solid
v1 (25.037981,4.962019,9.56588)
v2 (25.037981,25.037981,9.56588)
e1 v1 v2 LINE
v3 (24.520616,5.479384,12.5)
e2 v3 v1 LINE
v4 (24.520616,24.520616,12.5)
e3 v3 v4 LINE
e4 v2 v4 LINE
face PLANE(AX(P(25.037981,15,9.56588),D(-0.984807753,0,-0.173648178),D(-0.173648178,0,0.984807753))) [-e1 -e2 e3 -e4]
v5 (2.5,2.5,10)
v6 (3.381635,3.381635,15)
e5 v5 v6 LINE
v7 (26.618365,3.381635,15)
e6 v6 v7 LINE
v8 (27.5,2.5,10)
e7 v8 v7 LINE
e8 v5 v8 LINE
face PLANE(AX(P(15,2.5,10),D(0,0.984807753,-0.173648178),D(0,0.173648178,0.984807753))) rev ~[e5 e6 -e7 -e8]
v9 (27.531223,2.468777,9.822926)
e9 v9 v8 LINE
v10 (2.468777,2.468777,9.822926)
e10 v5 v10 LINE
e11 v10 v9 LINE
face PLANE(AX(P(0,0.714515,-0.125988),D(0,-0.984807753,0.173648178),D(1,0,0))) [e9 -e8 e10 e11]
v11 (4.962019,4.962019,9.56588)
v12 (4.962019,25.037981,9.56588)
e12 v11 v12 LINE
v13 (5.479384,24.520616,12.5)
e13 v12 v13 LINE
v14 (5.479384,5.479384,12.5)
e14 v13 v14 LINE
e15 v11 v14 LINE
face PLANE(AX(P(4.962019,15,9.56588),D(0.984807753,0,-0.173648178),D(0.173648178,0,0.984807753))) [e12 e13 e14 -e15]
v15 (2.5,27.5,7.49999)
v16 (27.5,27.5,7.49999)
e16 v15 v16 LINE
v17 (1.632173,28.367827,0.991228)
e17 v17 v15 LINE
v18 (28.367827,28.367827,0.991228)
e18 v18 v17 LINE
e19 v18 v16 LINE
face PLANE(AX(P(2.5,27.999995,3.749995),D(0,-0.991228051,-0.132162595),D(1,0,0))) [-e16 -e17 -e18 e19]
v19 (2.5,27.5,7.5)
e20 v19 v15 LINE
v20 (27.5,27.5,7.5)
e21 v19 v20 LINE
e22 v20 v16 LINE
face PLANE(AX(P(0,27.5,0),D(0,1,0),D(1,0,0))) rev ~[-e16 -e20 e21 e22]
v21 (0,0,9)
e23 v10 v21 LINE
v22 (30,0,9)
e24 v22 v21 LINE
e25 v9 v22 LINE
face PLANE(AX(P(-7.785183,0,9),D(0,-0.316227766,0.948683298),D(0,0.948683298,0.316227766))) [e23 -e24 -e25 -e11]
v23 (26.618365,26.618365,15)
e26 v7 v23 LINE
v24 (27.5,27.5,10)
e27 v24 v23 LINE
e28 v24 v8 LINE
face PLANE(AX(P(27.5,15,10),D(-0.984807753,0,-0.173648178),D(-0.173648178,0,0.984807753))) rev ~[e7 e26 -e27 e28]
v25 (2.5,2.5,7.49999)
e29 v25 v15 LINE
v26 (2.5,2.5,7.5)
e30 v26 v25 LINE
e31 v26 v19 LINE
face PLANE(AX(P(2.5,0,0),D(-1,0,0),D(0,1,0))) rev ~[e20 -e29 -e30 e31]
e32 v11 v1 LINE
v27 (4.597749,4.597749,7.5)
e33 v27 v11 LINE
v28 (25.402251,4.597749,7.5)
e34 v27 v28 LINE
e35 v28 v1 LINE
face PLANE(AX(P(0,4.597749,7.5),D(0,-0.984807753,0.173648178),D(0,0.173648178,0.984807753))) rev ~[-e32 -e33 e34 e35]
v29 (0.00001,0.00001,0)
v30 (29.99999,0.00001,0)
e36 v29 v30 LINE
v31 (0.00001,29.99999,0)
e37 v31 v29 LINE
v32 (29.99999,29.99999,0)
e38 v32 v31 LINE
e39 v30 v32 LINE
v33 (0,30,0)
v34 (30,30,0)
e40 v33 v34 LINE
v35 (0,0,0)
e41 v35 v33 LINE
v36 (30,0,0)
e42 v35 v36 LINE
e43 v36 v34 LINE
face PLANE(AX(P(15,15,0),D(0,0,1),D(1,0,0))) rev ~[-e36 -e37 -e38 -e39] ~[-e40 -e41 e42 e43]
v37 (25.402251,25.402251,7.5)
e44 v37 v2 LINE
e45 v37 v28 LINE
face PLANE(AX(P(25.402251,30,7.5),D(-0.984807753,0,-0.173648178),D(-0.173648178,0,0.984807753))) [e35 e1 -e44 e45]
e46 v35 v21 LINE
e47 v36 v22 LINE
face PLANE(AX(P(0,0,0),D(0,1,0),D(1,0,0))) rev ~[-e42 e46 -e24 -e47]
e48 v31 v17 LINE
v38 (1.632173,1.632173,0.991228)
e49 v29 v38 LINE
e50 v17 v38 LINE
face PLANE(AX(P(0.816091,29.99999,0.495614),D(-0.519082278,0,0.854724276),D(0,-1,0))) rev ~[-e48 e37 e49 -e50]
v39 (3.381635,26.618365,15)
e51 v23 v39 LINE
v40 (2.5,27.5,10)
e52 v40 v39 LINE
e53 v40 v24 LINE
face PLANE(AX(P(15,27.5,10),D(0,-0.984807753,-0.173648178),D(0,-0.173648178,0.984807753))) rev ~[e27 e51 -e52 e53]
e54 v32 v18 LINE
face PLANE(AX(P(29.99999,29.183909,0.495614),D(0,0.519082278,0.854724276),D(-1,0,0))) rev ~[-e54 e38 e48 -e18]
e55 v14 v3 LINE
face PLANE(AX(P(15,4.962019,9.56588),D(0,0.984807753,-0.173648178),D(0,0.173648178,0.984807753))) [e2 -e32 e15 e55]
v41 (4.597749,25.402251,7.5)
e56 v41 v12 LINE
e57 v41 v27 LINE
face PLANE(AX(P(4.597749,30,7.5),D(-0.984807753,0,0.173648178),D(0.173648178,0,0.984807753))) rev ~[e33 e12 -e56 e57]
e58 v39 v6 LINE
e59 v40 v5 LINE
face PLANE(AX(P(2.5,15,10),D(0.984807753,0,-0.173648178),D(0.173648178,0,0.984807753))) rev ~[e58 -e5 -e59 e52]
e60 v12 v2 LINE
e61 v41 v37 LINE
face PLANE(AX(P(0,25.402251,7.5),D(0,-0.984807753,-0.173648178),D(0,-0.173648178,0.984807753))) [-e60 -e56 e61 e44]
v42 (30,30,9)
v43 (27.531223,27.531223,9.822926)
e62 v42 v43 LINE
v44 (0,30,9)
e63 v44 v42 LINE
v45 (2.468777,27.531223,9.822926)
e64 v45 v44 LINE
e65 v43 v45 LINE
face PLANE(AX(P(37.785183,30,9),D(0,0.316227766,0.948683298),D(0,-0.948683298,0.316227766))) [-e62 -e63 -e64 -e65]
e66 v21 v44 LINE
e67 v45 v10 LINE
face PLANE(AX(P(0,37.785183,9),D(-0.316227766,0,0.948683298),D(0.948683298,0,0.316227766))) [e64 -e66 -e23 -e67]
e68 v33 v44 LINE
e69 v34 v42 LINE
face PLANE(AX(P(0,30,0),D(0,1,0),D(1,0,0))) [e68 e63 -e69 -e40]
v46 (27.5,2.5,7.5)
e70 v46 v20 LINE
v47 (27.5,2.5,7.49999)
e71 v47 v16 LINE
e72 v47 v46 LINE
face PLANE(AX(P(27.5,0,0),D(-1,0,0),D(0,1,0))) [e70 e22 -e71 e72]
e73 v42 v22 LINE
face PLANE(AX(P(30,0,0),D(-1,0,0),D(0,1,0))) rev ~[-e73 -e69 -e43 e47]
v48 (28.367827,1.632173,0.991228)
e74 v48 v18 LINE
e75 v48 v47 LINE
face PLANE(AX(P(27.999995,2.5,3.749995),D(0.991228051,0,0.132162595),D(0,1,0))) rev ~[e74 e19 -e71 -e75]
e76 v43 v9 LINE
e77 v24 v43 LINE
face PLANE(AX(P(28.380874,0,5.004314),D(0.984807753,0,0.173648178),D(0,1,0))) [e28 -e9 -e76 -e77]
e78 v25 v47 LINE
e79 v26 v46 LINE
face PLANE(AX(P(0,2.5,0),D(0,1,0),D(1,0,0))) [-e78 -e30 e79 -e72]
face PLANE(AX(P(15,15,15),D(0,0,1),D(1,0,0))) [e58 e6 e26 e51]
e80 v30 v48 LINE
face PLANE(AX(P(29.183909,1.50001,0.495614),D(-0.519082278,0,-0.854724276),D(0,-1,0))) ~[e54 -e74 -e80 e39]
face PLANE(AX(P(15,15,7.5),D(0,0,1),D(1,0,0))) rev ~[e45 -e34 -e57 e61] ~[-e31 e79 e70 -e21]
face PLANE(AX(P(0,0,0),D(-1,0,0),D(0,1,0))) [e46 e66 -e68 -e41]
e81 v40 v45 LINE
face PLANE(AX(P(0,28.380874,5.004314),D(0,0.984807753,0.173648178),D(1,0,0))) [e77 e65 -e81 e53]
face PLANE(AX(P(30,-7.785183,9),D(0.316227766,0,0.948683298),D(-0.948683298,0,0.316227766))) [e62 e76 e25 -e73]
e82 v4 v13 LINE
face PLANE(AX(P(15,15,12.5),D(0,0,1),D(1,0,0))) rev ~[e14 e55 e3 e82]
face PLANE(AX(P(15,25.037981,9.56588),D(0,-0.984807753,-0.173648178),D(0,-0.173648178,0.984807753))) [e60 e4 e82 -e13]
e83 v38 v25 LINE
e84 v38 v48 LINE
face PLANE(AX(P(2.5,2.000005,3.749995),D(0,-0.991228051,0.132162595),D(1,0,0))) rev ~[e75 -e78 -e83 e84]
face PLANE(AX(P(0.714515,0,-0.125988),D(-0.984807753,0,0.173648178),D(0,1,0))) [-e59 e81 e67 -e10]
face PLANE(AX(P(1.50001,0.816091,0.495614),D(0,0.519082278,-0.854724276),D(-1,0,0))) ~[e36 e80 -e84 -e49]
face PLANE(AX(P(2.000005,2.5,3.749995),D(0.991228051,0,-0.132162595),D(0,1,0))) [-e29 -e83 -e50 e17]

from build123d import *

# Parameters (mm, degrees)
F0_W          = 30
F0_H          = 30
F1_DEPTH      = 10
F2_T          = -2.5
F3_SIZE2      = 7.49999
F3_SIZE       = 0.99999
F4_W          = 25
F4_H          = 25
F5_DEPTH      = 5
F5_TAPER      = 10
F6_T          = 2.5
F6_T3_DEPTH   = 12.6321563139
F6_T5_DEPTH   = 12.6321563139
F6_T7_DEPTH   = 12.6321563139
F6_T9_DEPTH   = 12.6321563139
F6_T11_DEPTH  = 5.00001
F6_T13_DEPTH  = 30
F6_T15_DEPTH  = 30
F7_T4_DEPTH   = 45.5703660639
F7_T10_DEPTH  = 45.5703660639
F7_T16_DEPTH  = 45.5703660639
F7_T23_DEPTH  = 45.5703660639
F7_T29_DEPTH  = 45.5703660639
F7_T35_DEPTH  = 45.5703660639
F7_T41_DEPTH  = 45.5703660639
F7_T47_DEPTH  = 45.5703660639
F7_T54_DEPTH  = 45.5703660639
F7_T60_DEPTH  = 45.5703660639
F7_T66_DEPTH  = 45.5703660639
F7_T72_DEPTH  = 45.5703660639
F7_T78_DEPTH  = 45.5703660639
F7_T85_DEPTH  = 45.5703660639
F7_T91_DEPTH  = 45.5703660639
F7_T97_DEPTH  = 45.5703660639
F7_T103_DEPTH = 45.5703660639
F7_T109_DEPTH = 45.5703660639
F7_T116_DEPTH = 45.5703660639
F7_T122_DEPTH = 45.5703660639
F8_C1_SIZE2   = 1
F8_C1_SIZE    = 1.5
F8_C2_SIZE2   = 1
F8_C2_SIZE    = 1.5
F8_C3_SIZE2   = 1
F8_C3_SIZE    = 1.5
F8_C4_SIZE2   = 1
F8_C4_SIZE    = 1.5


# Not quite as in the source:
# - a fillet or chamfer that OpenCascade refuses, or shapes differently, is made with other operations: its cross-section is extruded or revolved along the edge and cut away or added
# - a fillet or chamfer is up to 0.001 mm smaller than in the source, because OpenCascade refuses the exact size
# - a shell that OpenCascade refuses in one call is made with other operations: the cavity is built on its own and cut out


with BuildPart() as f1:
    # F0 (on Top) → F1 (new body)
    with BuildSketch(Plane.XY):
        with Locations((15, 15)):
            Rectangle(F0_W, F0_H)
    extrude(amount=F1_DEPTH)

    # F2
    f2_openings = [f1.faces().sort_by_distance(p)[0] for p in [
        (15, 15, 0),
    ]]
    offset(amount=F2_T, openings=f2_openings)

    # F3 (size 1 and 7.5 in the source; OpenCascade refuses exactly that, so slightly less here)
    f3_edges = [f1.edges().sort_by_distance(p)[0] for p in [
        (27.5, 15, 0),
        (15, 27.5, 0),
        (2.5, 15, 0),
        (15, 2.5, 0),
    ]]
    chamfer(f3_edges, length=F3_SIZE, length2=F3_SIZE2)

    # F4 (on face) → F5 (join)
    with BuildSketch(Plane.XY.offset(10)):
        with Locations((15, 15)):
            Rectangle(F4_W, F4_H)
    extrude(amount=F5_DEPTH, taper=F5_TAPER)

    # F6: shell of thickness 2.5, made by hand


with BuildPart() as f6_core1:
    # F6_t2: copy of F1
    add(f1.part)

    # the walls: a layer under each face that stays
    f6_faces = [f6_core1.faces().sort_by_distance(p)[0] for p in [
        (1, 1, 0),
        (27.999995, 15, 3.749995),
        (15, 2.000005, 3.749995),
        (15, 27.999995, 3.749995),
        (2.000005, 15, 3.749995),
        (0, 15, 5),
        (15, 0, 5),
        (30, 15, 5),
        (15, 30, 5),
        (27.5, 15, 7.499995),
        (15, 2.5, 7.499995),
        (15, 27.5, 7.499995),
        (2.5, 15, 7.499995),
        (2.1428571429, 2.1428571429, 10),
        (27.0591825482, 15, 12.5),
        (15, 27.0591825482, 12.5),
        (2.9408174518, 15, 12.5),
        (15, 2.9408174518, 12.5),
        (15, 15, 15),
    ]]
    thicken(f6_faces, amount=-F6_T, mode=Mode.SUBTRACT)

    # F6_s4 → F6_t3 (cut)
    with BuildSketch(Plane(origin=(0.7910693611, -0.7910693611, -5.9330716286), x_dir=(-0.7071067812, -0.7071067812, 0), z_dir=(-0.1310232599, 0.1310232599, 0.9826829655))):
        Polygon((-21.2132034356, 18.7255916199), (-22.9654636265, 20.5443932655), (-21.2132034356, 22.2663095063), (-19.4609432447, 20.5443932655), align=None)
    extrude(amount=F6_T3_DEPTH, mode=Mode.SUBTRACT)

    # F6_s6 → F6_t5 (cut)
    with BuildSketch(Plane(origin=(1.3060821999, 1.3060821999, -9.7957013952), x_dir=(0.7071067812, -0.7071067812, 0), z_dir=(-0.1310232599, -0.1310232599, 0.9826829655))):
        Polygon((0, 39.5714452805), (1.7522601909, 41.3902469261), (0, 43.1121631669), (-1.7522601909, 41.3902469261), align=None)
    extrude(amount=F6_T5_DEPTH, mode=Mode.SUBTRACT)

    # F6_s8 → F6_t7 (cut)
    with BuildSketch(Plane(origin=(-0.2760565224, -0.2760565224, -2.0704418621), x_dir=(-0.7071067812, 0.7071067812, 0), z_dir=(0.1310232599, 0.1310232599, 0.9826829655))):
        Polygon((0, -2.1202620407), (-1.7522601909, -0.3014603951), (0, 1.4204558457), (1.7522601909, -0.3014603951), align=None)
    extrude(amount=F6_T7_DEPTH, mode=Mode.SUBTRACT)

    # F6_s10 → F6_t9 (cut)
    with BuildSketch(Plane(origin=(-0.7910693611, 0.7910693611, -5.9330716286), x_dir=(0.7071067812, 0.7071067812, 0), z_dir=(0.1310232599, -0.1310232599, 0.9826829655))):
        Polygon((21.2132034356, 18.7255916199), (22.9654636265, 20.5443932655), (21.2132034356, 22.2663095063), (19.4609432447, 20.5443932655), align=None)
    extrude(amount=F6_T9_DEPTH, mode=Mode.SUBTRACT)

    # F6_s12 → F6_t11 (cut)
    with BuildSketch(Plane.XY.offset(4.99999)):
        Polygon((27.475, 2.525), (30, 2.5), (30, 0), (27.5, 0), align=None)
        Polygon((27.475, 27.475), (30, 27.5), (30, 30), (27.5, 30), align=None)
        Polygon((2.525, 2.525), (2.5, 0), (0, 0), (0, 2.5), align=None)
        Polygon((2.525, 27.475), (2.5, 30), (0, 30), (0, 27.5), align=None)
    extrude(amount=F6_T11_DEPTH, mode=Mode.SUBTRACT)

    # F6_s14 → F6_t13 (cut)
    with BuildSketch(Plane.XZ.offset(-30)):
        Polygon((27.5246201938, 10.0293412044), (27.5, 7.5), (25.4022509221, 7.5), (25.0379806175, 9.5658795558), align=None)
        Polygon((2.4753798062, 10.0293412044), (2.5, 7.5), (4.5977490779, 7.5), (4.9620193825, 9.5658795558), align=None)
    extrude(amount=F6_T13_DEPTH, mode=Mode.SUBTRACT)

    # F6_s16 → F6_t15 (cut)
    with BuildSketch(Plane.YZ):
        Polygon((27.5246201938, 10.0293412044), (27.5, 7.5), (25.4022509221, 7.5), (25.0379806175, 9.5658795558), align=None)
        Polygon((2.4753798062, 10.0293412044), (2.5, 7.5), (4.5977490779, 7.5), (4.9620193825, 9.5658795558), align=None)
    extrude(amount=F6_T15_DEPTH, mode=Mode.SUBTRACT)


with BuildPart() as f1_1:
    add(f1.part)

    # what is left inside the walls is the cavity
    f6_cavity = [f6_core1.part.solids().sort_by_distance(p)[0] for p in [
        (15, 11.532583, 7.525),
    ]]
    add(f6_cavity, mode=Mode.SUBTRACT)

    # F7: chamfer of 1 x 3 on 4 edges, made by hand


with BuildPart() as f7_tool2:
    # F7_s3 → F7_t4 (new body)
    with BuildSketch(Plane.XZ.offset(7.785183032)):
        Polygon((30, 9), (27, 10), (30, 10), align=None)
    extrude(amount=-F7_T4_DEPTH)

    split(bisect_by=Plane(origin=(28.3808742524, 0, 5.0043138668), x_dir=(0, 1, 0), z_dir=(0.984807753, 0, 0.1736481777)), keep=Keep.TOP)

    split(bisect_by=Plane(origin=(0, 0.7145150594, -0.1259882831), x_dir=(1, 0, 0), z_dir=(0, -0.984807753, 0.1736481777)), keep=Keep.TOP)


with BuildPart() as f1_2:
    add(f1_1.part)

    # F7_t1: cut F7_tool2
    add(f7_tool2.part, mode=Mode.SUBTRACT)


with BuildPart() as f7_tool8:
    # F7_s9 → F7_t10 (new body)
    with BuildSketch(Plane.XZ.offset(7.785183032)):
        Polygon((30, 9), (27, 10), (30, 10), align=None)
    extrude(amount=-F7_T10_DEPTH)

    split(bisect_by=Plane(origin=(28.3808742524, 0, 5.0043138668), x_dir=(0, 1, 0), z_dir=(-0.984807753, 0, -0.1736481777)), keep=Keep.TOP)

    split(bisect_by=Plane(origin=(0, 0.7145150594, -0.1259882831), x_dir=(1, 0, 0), z_dir=(0, -0.984807753, 0.1736481777)), keep=Keep.TOP)


with BuildPart() as f1_3:
    add(f1_2.part)

    # F7_t7: cut F7_tool8
    add(f7_tool8.part, mode=Mode.SUBTRACT)


with BuildPart() as f7_tool14:
    # F7_s15 → F7_t16 (new body)
    with BuildSketch(Plane.XZ.offset(7.785183032)):
        Polygon((30, 9), (27, 10), (30, 10), align=None)
    extrude(amount=-F7_T16_DEPTH)

    split(bisect_by=Plane(origin=(28.3808742524, 0, 5.0043138668), x_dir=(0, 1, 0), z_dir=(0.984807753, 0, 0.1736481777)), keep=Keep.TOP)

    split(bisect_by=Plane(origin=(0, 28.3808742524, 5.0043138668), x_dir=(1, 0, 0), z_dir=(0, -0.984807753, -0.1736481777)), keep=Keep.TOP)

    split(bisect_by=Plane(origin=(0, 0.7145150594, -0.1259882831), x_dir=(1, 0, 0), z_dir=(0, 0.984807753, -0.1736481777)), keep=Keep.TOP)


with BuildPart() as f1_4:
    add(f1_3.part)

    # F7_t13: cut F7_tool14
    add(f7_tool14.part, mode=Mode.SUBTRACT)


with BuildPart() as f7_tool21:
    # F7_s22 → F7_t23 (new body)
    with BuildSketch(Plane.XZ.offset(7.785183032)):
        Polygon((30, 9), (27, 10), (30, 10), align=None)
    extrude(amount=-F7_T23_DEPTH)

    split(bisect_by=Plane(origin=(28.3808742524, 0, 5.0043138668), x_dir=(0, 1, 0), z_dir=(0.984807753, 0, 0.1736481777)), keep=Keep.TOP)

    split(bisect_by=Plane(origin=(0, 28.3808742524, 5.0043138668), x_dir=(1, 0, 0), z_dir=(0, 0.984807753, 0.1736481777)), keep=Keep.TOP)


with BuildPart() as f1_5:
    add(f1_4.part)

    # F7_t20: cut F7_tool21
    add(f7_tool21.part, mode=Mode.SUBTRACT)


with BuildPart() as f7_tool27:
    # F7_s28 → F7_t29 (new body)
    with BuildSketch(Plane.XZ.offset(7.785183032)):
        Polygon((30, 9), (27, 10), (30, 10), align=None)
    extrude(amount=-F7_T29_DEPTH)

    split(bisect_by=Plane(origin=(28.3808742524, 0, 5.0043138668), x_dir=(0, 1, 0), z_dir=(-0.984807753, 0, -0.1736481777)), keep=Keep.TOP)

    split(bisect_by=Plane(origin=(0, 28.3808742524, 5.0043138668), x_dir=(1, 0, 0), z_dir=(0, 0.984807753, 0.1736481777)), keep=Keep.TOP)


with BuildPart() as f1_6:
    add(f1_5.part)

    # F7_t26: cut F7_tool27
    add(f7_tool27.part, mode=Mode.SUBTRACT)


with BuildPart() as f7_tool33:
    # F7_s34 → F7_t35 (new body)
    with BuildSketch(Plane.YZ.offset(-7.785183032)):
        Polygon((0, 9), (3, 10), (0, 10), align=None)
    extrude(amount=F7_T35_DEPTH)

    split(bisect_by=Plane(origin=(0.7145150594, 0, -0.1259882831), x_dir=(0, 1, 0), z_dir=(-0.984807753, 0, 0.1736481777)), keep=Keep.TOP)

    split(bisect_by=Plane(origin=(0, 0.7145150594, -0.1259882831), x_dir=(1, 0, 0), z_dir=(0, -0.984807753, 0.1736481777)), keep=Keep.TOP)


with BuildPart() as f1_7:
    add(f1_6.part)

    # F7_t32: cut F7_tool33
    add(f7_tool33.part, mode=Mode.SUBTRACT)


with BuildPart() as f7_tool39:
    # F7_s40 → F7_t41 (new body)
    with BuildSketch(Plane.YZ.offset(-7.785183032)):
        Polygon((0, 9), (3, 10), (0, 10), align=None)
    extrude(amount=F7_T41_DEPTH)

    split(bisect_by=Plane(origin=(0.7145150594, 0, -0.1259882831), x_dir=(0, 1, 0), z_dir=(-0.984807753, 0, 0.1736481777)), keep=Keep.TOP)

    split(bisect_by=Plane(origin=(0, 0.7145150594, -0.1259882831), x_dir=(1, 0, 0), z_dir=(0, 0.984807753, -0.1736481777)), keep=Keep.TOP)


with BuildPart() as f1_8:
    add(f1_7.part)

    # F7_t38: cut F7_tool39
    add(f7_tool39.part, mode=Mode.SUBTRACT)


with BuildPart() as f7_tool45:
    # F7_s46 → F7_t47 (new body)
    with BuildSketch(Plane.YZ.offset(-7.785183032)):
        Polygon((0, 9), (3, 10), (0, 10), align=None)
    extrude(amount=F7_T47_DEPTH)

    split(bisect_by=Plane(origin=(28.3808742524, 0, 5.0043138668), x_dir=(0, 1, 0), z_dir=(-0.984807753, 0, -0.1736481777)), keep=Keep.TOP)

    split(bisect_by=Plane(origin=(0.7145150594, 0, -0.1259882831), x_dir=(0, 1, 0), z_dir=(0.984807753, 0, -0.1736481777)), keep=Keep.TOP)

    split(bisect_by=Plane(origin=(0, 0.7145150594, -0.1259882831), x_dir=(1, 0, 0), z_dir=(0, -0.984807753, 0.1736481777)), keep=Keep.TOP)


with BuildPart() as f1_9:
    add(f1_8.part)

    # F7_t44: cut F7_tool45
    add(f7_tool45.part, mode=Mode.SUBTRACT)


with BuildPart() as f7_tool52:
    # F7_s53 → F7_t54 (new body)
    with BuildSketch(Plane.YZ.offset(-7.785183032)):
        Polygon((0, 9), (3, 10), (0, 10), align=None)
    extrude(amount=F7_T54_DEPTH)

    split(bisect_by=Plane(origin=(28.3808742524, 0, 5.0043138668), x_dir=(0, 1, 0), z_dir=(0.984807753, 0, 0.1736481777)), keep=Keep.TOP)

    split(bisect_by=Plane(origin=(0, 0.7145150594, -0.1259882831), x_dir=(1, 0, 0), z_dir=(0, -0.984807753, 0.1736481777)), keep=Keep.TOP)


with BuildPart() as f1_10:
    add(f1_9.part)

    # F7_t51: cut F7_tool52
    add(f7_tool52.part, mode=Mode.SUBTRACT)


with BuildPart() as f7_tool58:
    # F7_s59 → F7_t60 (new body)
    with BuildSketch(Plane.YZ.offset(-7.785183032)):
        Polygon((0, 9), (3, 10), (0, 10), align=None)
    extrude(amount=F7_T60_DEPTH)

    split(bisect_by=Plane(origin=(28.3808742524, 0, 5.0043138668), x_dir=(0, 1, 0), z_dir=(0.984807753, 0, 0.1736481777)), keep=Keep.TOP)

    split(bisect_by=Plane(origin=(0, 0.7145150594, -0.1259882831), x_dir=(1, 0, 0), z_dir=(0, 0.984807753, -0.1736481777)), keep=Keep.TOP)


with BuildPart() as f1_11:
    add(f1_10.part)

    # F7_t57: cut F7_tool58
    add(f7_tool58.part, mode=Mode.SUBTRACT)


with BuildPart() as f7_tool64:
    # F7_s65 → F7_t66 (new body)
    with BuildSketch(Plane.XZ.offset(-37.785183032)):
        Polygon((0, 9), (3, 10), (0, 10), align=None)
    extrude(amount=F7_T66_DEPTH)

    split(bisect_by=Plane(origin=(0, 28.3808742524, 5.0043138668), x_dir=(1, 0, 0), z_dir=(0, 0.984807753, 0.1736481777)), keep=Keep.TOP)

    split(bisect_by=Plane(origin=(0.7145150594, 0, -0.1259882831), x_dir=(0, 1, 0), z_dir=(-0.984807753, 0, 0.1736481777)), keep=Keep.TOP)


with BuildPart() as f1_12:
    add(f1_11.part)

    # F7_t63: cut F7_tool64
    add(f7_tool64.part, mode=Mode.SUBTRACT)


with BuildPart() as f7_tool70:
    # F7_s71 → F7_t72 (new body)
    with BuildSketch(Plane.XZ.offset(-37.785183032)):
        Polygon((0, 9), (3, 10), (0, 10), align=None)
    extrude(amount=F7_T72_DEPTH)

    split(bisect_by=Plane(origin=(0, 28.3808742524, 5.0043138668), x_dir=(1, 0, 0), z_dir=(0, 0.984807753, 0.1736481777)), keep=Keep.TOP)

    split(bisect_by=Plane(origin=(0.7145150594, 0, -0.1259882831), x_dir=(0, 1, 0), z_dir=(0.984807753, 0, -0.1736481777)), keep=Keep.TOP)


with BuildPart() as f1_13:
    add(f1_12.part)

    # F7_t69: cut F7_tool70
    add(f7_tool70.part, mode=Mode.SUBTRACT)


with BuildPart() as f7_tool76:
    # F7_s77 → F7_t78 (new body)
    with BuildSketch(Plane.XZ.offset(-37.785183032)):
        Polygon((0, 9), (3, 10), (0, 10), align=None)
    extrude(amount=F7_T78_DEPTH)

    split(bisect_by=Plane(origin=(0, 28.3808742524, 5.0043138668), x_dir=(1, 0, 0), z_dir=(0, -0.984807753, -0.1736481777)), keep=Keep.TOP)

    split(bisect_by=Plane(origin=(0.7145150594, 0, -0.1259882831), x_dir=(0, 1, 0), z_dir=(-0.984807753, 0, 0.1736481777)), keep=Keep.TOP)

    split(bisect_by=Plane(origin=(0, 0.7145150594, -0.1259882831), x_dir=(1, 0, 0), z_dir=(0, 0.984807753, -0.1736481777)), keep=Keep.TOP)


with BuildPart() as f1_14:
    add(f1_13.part)

    # F7_t75: cut F7_tool76
    add(f7_tool76.part, mode=Mode.SUBTRACT)


with BuildPart() as f7_tool83:
    # F7_s84 → F7_t85 (new body)
    with BuildSketch(Plane.XZ.offset(-37.785183032)):
        Polygon((0, 9), (3, 10), (0, 10), align=None)
    extrude(amount=F7_T85_DEPTH)

    split(bisect_by=Plane(origin=(0.7145150594, 0, -0.1259882831), x_dir=(0, 1, 0), z_dir=(-0.984807753, 0, 0.1736481777)), keep=Keep.TOP)

    split(bisect_by=Plane(origin=(0, 0.7145150594, -0.1259882831), x_dir=(1, 0, 0), z_dir=(0, -0.984807753, 0.1736481777)), keep=Keep.TOP)


with BuildPart() as f1_15:
    add(f1_14.part)

    # F7_t82: cut F7_tool83
    add(f7_tool83.part, mode=Mode.SUBTRACT)


with BuildPart() as f7_tool89:
    # F7_s90 → F7_t91 (new body)
    with BuildSketch(Plane.XZ.offset(-37.785183032)):
        Polygon((0, 9), (3, 10), (0, 10), align=None)
    extrude(amount=F7_T91_DEPTH)

    split(bisect_by=Plane(origin=(0.7145150594, 0, -0.1259882831), x_dir=(0, 1, 0), z_dir=(0.984807753, 0, -0.1736481777)), keep=Keep.TOP)

    split(bisect_by=Plane(origin=(0, 0.7145150594, -0.1259882831), x_dir=(1, 0, 0), z_dir=(0, -0.984807753, 0.1736481777)), keep=Keep.TOP)


with BuildPart() as f1_16:
    add(f1_15.part)

    # F7_t88: cut F7_tool89
    add(f7_tool89.part, mode=Mode.SUBTRACT)


with BuildPart() as f7_tool95:
    # F7_s96 → F7_t97 (new body)
    with BuildSketch(Plane.YZ.offset(37.785183032)):
        Polygon((30, 9), (27, 10), (30, 10), align=None)
    extrude(amount=-F7_T97_DEPTH)

    split(bisect_by=Plane(origin=(28.3808742524, 0, 5.0043138668), x_dir=(0, 1, 0), z_dir=(0.984807753, 0, 0.1736481777)), keep=Keep.TOP)

    split(bisect_by=Plane(origin=(0, 28.3808742524, 5.0043138668), x_dir=(1, 0, 0), z_dir=(0, 0.984807753, 0.1736481777)), keep=Keep.TOP)


with BuildPart() as f1_17:
    add(f1_16.part)

    # F7_t94: cut F7_tool95
    add(f7_tool95.part, mode=Mode.SUBTRACT)


with BuildPart() as f7_tool101:
    # F7_s102 → F7_t103 (new body)
    with BuildSketch(Plane.YZ.offset(37.785183032)):
        Polygon((30, 9), (27, 10), (30, 10), align=None)
    extrude(amount=-F7_T103_DEPTH)

    split(bisect_by=Plane(origin=(28.3808742524, 0, 5.0043138668), x_dir=(0, 1, 0), z_dir=(0.984807753, 0, 0.1736481777)), keep=Keep.TOP)

    split(bisect_by=Plane(origin=(0, 28.3808742524, 5.0043138668), x_dir=(1, 0, 0), z_dir=(0, -0.984807753, -0.1736481777)), keep=Keep.TOP)


with BuildPart() as f1_18:
    add(f1_17.part)

    # F7_t100: cut F7_tool101
    add(f7_tool101.part, mode=Mode.SUBTRACT)


with BuildPart() as f7_tool107:
    # F7_s108 → F7_t109 (new body)
    with BuildSketch(Plane.YZ.offset(37.785183032)):
        Polygon((30, 9), (27, 10), (30, 10), align=None)
    extrude(amount=-F7_T109_DEPTH)

    split(bisect_by=Plane(origin=(28.3808742524, 0, 5.0043138668), x_dir=(0, 1, 0), z_dir=(-0.984807753, 0, -0.1736481777)), keep=Keep.TOP)

    split(bisect_by=Plane(origin=(0, 28.3808742524, 5.0043138668), x_dir=(1, 0, 0), z_dir=(0, 0.984807753, 0.1736481777)), keep=Keep.TOP)

    split(bisect_by=Plane(origin=(0.7145150594, 0, -0.1259882831), x_dir=(0, 1, 0), z_dir=(0.984807753, 0, -0.1736481777)), keep=Keep.TOP)


with BuildPart() as f1_19:
    add(f1_18.part)

    # F7_t106: cut F7_tool107
    add(f7_tool107.part, mode=Mode.SUBTRACT)


with BuildPart() as f7_tool114:
    # F7_s115 → F7_t116 (new body)
    with BuildSketch(Plane.YZ.offset(37.785183032)):
        Polygon((30, 9), (27, 10), (30, 10), align=None)
    extrude(amount=-F7_T116_DEPTH)

    split(bisect_by=Plane(origin=(0, 28.3808742524, 5.0043138668), x_dir=(1, 0, 0), z_dir=(0, 0.984807753, 0.1736481777)), keep=Keep.TOP)

    split(bisect_by=Plane(origin=(0.7145150594, 0, -0.1259882831), x_dir=(0, 1, 0), z_dir=(-0.984807753, 0, 0.1736481777)), keep=Keep.TOP)


with BuildPart() as f1_20:
    add(f1_19.part)

    # F7_t113: cut F7_tool114
    add(f7_tool114.part, mode=Mode.SUBTRACT)


with BuildPart() as f7_tool120:
    # F7_s121 → F7_t122 (new body)
    with BuildSketch(Plane.YZ.offset(37.785183032)):
        Polygon((30, 9), (27, 10), (30, 10), align=None)
    extrude(amount=-F7_T122_DEPTH)

    split(bisect_by=Plane(origin=(0, 28.3808742524, 5.0043138668), x_dir=(1, 0, 0), z_dir=(0, -0.984807753, -0.1736481777)), keep=Keep.TOP)

    split(bisect_by=Plane(origin=(0.7145150594, 0, -0.1259882831), x_dir=(0, 1, 0), z_dir=(-0.984807753, 0, 0.1736481777)), keep=Keep.TOP)


with BuildPart() as f1_21:
    add(f1_20.part)

    # F7_t119: cut F7_tool120
    add(f7_tool120.part, mode=Mode.SUBTRACT)

    # F8: chamfer of 1 x 1.5 on 4 edges, made by hand

    # F8_c1
    f8_c1_edges = [f1_21.edges().sort_by_distance(p)[0] for p in [
        (28.49999, 15, 0),
    ]]
    f8_c1_side = f1_21.faces().sort_by_distance((28.51999, 15, 0))[0]
    chamfer(f8_c1_edges, length=F8_C1_SIZE, length2=F8_C1_SIZE2, reference=f8_c1_side)

    # F8_c2
    f8_c2_edges = [f1_21.edges().sort_by_distance(p)[0] for p in [
        (15, 1.50001, 0),
    ]]
    f8_c2_side = f1_21.faces().sort_by_distance((15, 1.48001, 0))[0]
    chamfer(f8_c2_edges, length=F8_C2_SIZE, length2=F8_C2_SIZE2, reference=f8_c2_side)

    # F8_c3
    f8_c3_edges = [f1_21.edges().sort_by_distance(p)[0] for p in [
        (15, 28.49999, 0),
    ]]
    f8_c3_side = f1_21.faces().sort_by_distance((15, 28.51999, 0))[0]
    chamfer(f8_c3_edges, length=F8_C3_SIZE, length2=F8_C3_SIZE2, reference=f8_c3_side)

    # F8_c4
    f8_c4_edges = [f1_21.edges().sort_by_distance(p)[0] for p in [
        (1.50001, 15, 0),
    ]]
    f8_c4_side = f1_21.faces().sort_by_distance((1.48001, 15, 0))[0]
    chamfer(f8_c4_edges, length=F8_C4_SIZE, length2=F8_C4_SIZE2, reference=f8_c4_side)


solid = f1_21.part
